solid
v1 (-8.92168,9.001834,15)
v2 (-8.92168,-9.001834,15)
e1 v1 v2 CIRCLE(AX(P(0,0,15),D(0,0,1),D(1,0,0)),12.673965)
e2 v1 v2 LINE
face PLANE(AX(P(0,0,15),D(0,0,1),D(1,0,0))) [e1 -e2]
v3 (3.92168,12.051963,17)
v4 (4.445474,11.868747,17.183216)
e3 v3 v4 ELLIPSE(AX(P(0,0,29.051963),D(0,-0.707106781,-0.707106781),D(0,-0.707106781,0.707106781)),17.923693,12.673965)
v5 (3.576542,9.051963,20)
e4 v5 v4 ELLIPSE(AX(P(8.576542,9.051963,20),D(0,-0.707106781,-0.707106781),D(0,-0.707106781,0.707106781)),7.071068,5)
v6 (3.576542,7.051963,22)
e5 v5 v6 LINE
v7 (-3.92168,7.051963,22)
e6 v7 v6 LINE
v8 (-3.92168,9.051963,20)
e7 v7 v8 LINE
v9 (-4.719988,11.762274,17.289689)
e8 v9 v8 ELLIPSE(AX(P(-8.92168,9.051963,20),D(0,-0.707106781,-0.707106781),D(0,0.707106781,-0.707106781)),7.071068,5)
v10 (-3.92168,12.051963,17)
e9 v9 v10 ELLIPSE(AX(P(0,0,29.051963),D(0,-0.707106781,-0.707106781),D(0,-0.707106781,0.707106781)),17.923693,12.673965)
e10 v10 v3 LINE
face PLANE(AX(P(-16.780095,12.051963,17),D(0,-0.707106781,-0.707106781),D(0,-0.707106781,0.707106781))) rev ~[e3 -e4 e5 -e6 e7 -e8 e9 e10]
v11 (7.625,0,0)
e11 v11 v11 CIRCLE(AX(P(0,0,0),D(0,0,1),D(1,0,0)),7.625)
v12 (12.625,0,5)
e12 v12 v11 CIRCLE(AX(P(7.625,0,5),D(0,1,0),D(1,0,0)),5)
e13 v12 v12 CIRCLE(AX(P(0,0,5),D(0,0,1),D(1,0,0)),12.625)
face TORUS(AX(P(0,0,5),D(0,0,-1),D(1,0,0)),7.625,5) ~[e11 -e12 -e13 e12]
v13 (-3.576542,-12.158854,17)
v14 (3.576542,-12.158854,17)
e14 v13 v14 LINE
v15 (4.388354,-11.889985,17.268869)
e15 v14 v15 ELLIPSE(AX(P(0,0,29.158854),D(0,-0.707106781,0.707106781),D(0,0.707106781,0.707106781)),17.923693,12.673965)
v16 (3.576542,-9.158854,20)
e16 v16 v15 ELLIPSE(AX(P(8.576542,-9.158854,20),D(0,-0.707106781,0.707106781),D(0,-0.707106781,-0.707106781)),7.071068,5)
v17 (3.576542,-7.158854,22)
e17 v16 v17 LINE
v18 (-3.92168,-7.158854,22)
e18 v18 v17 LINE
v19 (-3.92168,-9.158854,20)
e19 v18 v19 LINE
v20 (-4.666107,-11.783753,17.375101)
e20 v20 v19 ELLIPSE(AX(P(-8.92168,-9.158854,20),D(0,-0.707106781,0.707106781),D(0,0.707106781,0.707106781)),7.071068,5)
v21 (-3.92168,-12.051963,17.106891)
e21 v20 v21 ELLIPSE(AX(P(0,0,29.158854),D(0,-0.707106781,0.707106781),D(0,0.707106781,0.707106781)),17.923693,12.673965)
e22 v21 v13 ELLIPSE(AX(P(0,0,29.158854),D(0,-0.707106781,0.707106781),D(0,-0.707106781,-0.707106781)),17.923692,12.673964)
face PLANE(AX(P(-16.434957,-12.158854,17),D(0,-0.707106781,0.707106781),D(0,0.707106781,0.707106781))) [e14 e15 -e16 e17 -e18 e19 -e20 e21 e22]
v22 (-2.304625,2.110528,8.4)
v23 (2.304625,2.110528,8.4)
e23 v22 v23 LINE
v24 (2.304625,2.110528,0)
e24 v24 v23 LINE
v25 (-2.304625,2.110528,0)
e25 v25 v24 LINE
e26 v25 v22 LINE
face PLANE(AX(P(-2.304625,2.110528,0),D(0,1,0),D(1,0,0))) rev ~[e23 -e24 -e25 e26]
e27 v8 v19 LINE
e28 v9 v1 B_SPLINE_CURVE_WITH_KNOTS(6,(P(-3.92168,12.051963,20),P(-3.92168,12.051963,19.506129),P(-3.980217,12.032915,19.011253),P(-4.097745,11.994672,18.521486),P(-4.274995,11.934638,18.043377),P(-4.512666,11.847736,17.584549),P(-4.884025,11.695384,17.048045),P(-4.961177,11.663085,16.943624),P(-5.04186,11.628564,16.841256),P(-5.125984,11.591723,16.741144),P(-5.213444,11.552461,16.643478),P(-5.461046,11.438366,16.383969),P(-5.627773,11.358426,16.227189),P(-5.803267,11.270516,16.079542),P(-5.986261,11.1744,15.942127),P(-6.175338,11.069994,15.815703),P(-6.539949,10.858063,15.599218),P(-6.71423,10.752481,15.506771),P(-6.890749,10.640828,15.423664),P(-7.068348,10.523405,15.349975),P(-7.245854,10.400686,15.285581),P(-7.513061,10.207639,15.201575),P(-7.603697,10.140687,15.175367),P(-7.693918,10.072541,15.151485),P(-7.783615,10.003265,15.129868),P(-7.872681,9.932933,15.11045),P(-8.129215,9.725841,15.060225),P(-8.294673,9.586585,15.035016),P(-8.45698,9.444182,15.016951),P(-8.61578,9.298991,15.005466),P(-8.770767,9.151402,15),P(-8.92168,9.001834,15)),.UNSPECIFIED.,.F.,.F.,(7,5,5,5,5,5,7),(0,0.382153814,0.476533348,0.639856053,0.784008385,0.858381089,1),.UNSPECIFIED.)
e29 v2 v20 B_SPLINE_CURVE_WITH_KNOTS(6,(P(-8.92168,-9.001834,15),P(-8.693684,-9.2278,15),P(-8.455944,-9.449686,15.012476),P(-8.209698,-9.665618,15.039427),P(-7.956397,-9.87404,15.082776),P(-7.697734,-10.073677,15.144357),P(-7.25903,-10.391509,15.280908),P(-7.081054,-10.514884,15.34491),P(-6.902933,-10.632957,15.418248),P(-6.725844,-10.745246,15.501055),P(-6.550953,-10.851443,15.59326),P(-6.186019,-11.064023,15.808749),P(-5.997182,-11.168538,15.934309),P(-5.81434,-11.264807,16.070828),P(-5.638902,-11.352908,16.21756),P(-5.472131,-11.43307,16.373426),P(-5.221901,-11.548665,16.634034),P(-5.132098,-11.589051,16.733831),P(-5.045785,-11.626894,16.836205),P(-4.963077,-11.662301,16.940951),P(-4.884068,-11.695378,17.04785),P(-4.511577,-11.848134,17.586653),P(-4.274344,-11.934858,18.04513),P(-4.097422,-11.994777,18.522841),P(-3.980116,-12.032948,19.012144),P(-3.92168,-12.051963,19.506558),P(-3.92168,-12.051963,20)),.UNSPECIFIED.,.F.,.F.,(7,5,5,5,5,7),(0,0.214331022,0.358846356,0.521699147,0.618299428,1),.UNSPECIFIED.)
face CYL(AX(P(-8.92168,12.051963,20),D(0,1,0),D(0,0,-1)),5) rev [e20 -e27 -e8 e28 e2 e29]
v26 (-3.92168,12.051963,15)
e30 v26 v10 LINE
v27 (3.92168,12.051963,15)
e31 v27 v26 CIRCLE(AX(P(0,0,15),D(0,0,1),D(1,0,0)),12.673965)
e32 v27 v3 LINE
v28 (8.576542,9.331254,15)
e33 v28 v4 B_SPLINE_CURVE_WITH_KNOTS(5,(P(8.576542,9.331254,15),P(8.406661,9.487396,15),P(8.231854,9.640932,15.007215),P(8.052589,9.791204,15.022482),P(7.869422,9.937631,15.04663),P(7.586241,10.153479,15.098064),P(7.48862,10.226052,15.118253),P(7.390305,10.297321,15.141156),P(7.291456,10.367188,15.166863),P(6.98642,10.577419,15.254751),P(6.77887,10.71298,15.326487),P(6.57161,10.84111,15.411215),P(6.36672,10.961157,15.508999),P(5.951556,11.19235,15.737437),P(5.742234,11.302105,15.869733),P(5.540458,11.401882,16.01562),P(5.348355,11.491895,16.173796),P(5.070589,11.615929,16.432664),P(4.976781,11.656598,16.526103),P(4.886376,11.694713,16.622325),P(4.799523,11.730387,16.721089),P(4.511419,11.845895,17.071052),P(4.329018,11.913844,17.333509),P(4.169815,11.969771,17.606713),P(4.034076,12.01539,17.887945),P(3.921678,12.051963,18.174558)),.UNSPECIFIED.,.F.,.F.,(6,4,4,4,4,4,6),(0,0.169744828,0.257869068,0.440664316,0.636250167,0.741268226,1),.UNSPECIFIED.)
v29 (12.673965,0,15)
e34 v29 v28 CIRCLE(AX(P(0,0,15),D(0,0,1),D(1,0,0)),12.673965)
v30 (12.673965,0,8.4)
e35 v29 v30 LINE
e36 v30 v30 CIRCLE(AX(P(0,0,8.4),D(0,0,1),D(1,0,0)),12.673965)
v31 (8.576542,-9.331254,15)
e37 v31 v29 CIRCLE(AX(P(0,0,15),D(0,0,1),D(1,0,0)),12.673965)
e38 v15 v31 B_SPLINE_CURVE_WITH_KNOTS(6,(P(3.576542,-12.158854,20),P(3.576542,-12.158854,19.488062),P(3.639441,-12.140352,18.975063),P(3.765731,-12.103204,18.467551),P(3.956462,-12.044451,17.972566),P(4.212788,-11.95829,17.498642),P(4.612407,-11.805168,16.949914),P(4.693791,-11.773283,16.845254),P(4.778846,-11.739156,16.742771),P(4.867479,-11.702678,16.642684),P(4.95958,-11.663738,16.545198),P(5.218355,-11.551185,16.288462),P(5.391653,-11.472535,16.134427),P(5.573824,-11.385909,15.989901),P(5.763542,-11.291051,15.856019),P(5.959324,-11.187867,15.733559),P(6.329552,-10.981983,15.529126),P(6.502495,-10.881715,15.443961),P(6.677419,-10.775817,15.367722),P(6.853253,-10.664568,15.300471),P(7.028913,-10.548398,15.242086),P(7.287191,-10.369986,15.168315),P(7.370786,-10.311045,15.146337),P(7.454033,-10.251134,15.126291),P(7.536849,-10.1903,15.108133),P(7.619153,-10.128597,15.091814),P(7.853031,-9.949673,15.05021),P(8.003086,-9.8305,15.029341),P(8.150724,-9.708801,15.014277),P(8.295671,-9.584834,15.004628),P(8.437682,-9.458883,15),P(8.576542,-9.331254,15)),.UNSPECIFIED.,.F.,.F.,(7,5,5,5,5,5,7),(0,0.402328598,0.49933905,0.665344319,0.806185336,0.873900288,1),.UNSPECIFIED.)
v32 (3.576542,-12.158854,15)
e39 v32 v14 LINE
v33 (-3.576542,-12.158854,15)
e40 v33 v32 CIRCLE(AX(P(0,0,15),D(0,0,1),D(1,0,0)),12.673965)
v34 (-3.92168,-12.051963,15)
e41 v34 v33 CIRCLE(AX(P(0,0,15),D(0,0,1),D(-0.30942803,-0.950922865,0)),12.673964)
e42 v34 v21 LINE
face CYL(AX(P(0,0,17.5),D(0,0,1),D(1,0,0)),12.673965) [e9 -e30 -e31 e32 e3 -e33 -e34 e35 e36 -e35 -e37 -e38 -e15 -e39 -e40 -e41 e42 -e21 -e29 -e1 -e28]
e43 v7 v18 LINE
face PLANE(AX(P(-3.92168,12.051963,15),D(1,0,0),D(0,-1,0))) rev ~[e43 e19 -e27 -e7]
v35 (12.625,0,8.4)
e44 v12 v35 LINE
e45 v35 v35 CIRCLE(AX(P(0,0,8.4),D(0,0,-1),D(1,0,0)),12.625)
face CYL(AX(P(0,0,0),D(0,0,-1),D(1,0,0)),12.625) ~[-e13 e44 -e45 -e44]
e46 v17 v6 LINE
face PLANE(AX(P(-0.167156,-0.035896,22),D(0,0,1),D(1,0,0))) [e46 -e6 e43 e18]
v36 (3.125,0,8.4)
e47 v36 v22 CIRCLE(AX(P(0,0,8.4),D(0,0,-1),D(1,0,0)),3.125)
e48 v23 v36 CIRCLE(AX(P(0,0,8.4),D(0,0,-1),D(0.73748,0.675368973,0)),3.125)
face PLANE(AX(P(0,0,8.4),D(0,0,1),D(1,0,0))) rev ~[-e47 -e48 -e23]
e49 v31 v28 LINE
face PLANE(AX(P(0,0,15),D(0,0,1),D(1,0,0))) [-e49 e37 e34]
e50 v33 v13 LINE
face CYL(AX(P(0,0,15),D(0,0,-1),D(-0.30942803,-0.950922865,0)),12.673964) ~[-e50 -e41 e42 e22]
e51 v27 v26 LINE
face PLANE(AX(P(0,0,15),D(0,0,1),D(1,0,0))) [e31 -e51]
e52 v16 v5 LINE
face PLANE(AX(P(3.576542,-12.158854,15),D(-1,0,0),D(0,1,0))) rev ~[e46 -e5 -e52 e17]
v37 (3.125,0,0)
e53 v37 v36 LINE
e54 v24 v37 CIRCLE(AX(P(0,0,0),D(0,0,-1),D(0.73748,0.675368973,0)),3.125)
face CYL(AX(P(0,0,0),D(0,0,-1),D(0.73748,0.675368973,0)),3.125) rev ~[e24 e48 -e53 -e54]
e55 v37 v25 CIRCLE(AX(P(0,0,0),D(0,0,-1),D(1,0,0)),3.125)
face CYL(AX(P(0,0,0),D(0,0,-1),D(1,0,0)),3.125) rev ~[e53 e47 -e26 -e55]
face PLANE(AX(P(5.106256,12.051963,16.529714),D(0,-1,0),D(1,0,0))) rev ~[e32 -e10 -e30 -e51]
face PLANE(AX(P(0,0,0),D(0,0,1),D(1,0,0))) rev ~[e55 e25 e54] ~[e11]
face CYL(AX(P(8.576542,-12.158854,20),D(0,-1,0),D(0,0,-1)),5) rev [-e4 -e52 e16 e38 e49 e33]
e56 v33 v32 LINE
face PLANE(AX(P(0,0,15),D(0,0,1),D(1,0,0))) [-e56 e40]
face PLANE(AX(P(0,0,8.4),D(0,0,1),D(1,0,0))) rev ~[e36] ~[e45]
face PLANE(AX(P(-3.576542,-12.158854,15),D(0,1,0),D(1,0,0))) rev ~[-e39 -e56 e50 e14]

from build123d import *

# Parameters (mm, degrees)
F0_R         = 12.625
F0_R_2       = 10.375
F0_R_3       = 5
F1_DEPTH     = 15
F2_DEPTH     = 15
F3_R         = 12.6739646699
F4_DEPTH     = 6.6
F6_DEPTH     = 7
F7_T4_DEPTH  = 36.6039255786
F7_S5_R      = 12.6739646699
F7_T6_DEPTH  = 20
F7_T10_DEPTH = 24.210816556
F7_S11_R     = 12.6739646699
F7_T12_DEPTH = 14
F8_T1_DEPTH  = 32.8699146781
F9_T1_DEPTH  = 33.2150521969
F10_R        = 5


# Not quite as in the source:
# - a fillet or chamfer that OpenCascade refuses, or shapes differently, is made with other operations: its cross-section is extruded or revolved along the edge and cut away or added
# - a feature names something its author has since deleted; it is built from what else it names


with BuildPart() as f1:
    # F0 (on Top) → F1 (new body)
    with BuildSketch(Plane.XY):
        Circle(F0_R)
        Circle(F0_R_2, mode=Mode.SUBTRACT)
        Circle(F0_R_2)
        Circle(F0_R_3, mode=Mode.SUBTRACT)
    extrude(amount=F1_DEPTH)

    # F0 (on Top) → F2 (join)
    with BuildSketch(Plane.XY):
        Circle(F0_R_3)
        with BuildLine():
            ThreePointArc((2.304625, 2.1105280404), (2.9126944678, 1.1321819366), (3.125, 0))
            ThreePointArc((3.125, 0), (-1.1321819366, -2.9126944678), (-2.304625, 2.1105280404))
            ThreePointArc((-2.304625, 2.1105280404), (0, 3.125), (2.304625, 2.1105280404))
        make_face(mode=Mode.SUBTRACT)
        with BuildLine():
            Line((-2.304625, 2.1105280404), (2.304625, 2.1105280404))
            ThreePointArc((2.304625, 2.1105280404), (0, 3.125), (-2.304625, 2.1105280404))
        make_face()
    extrude(amount=F2_DEPTH)

    # F3 (on face) → F4 (join)
    with BuildSketch(Plane.XY.offset(15)):
        Circle(F3_R)
    extrude(amount=-F4_DEPTH)

    # F5 (on face) → F6 (join)
    with BuildSketch(Plane.XY.offset(15)):
        with BuildLine():
            Line((3.5765423992, 12.0519627893), (-3.921679918, 12.0519627893))
            Line((-3.921679918, 12.0519627893), (-3.921679918, -12.0519627893))
            ThreePointArc((-3.921679918, -12.0519627893), (-3.7494920856, -12.1066382433), (-3.5765423992, -12.1588537667))
            Line((-3.5765423992, -12.1588537667), (3.5765423992, -12.1588537667))
            Line((3.5765423992, -12.1588537667), (3.5765423992, 12.0519627893))
        make_face()
    extrude(amount=F6_DEPTH)

    # F7: fillet of radius 5 on 2 edges, made by hand


with BuildPart() as f7_tool2:
    # F7_s3 → F7_t4 (new body)
    with BuildSketch(Plane.XZ.offset(-12.0519627893)):
        with BuildLine():
            ThreePointArc((-8.921679918, 15), (-5.3861460121, 16.4644660941), (-3.921679918, 20))
            Line((-3.921679918, 20), (-3.921679918, 15))
            Line((-3.921679918, 15), (-8.921679918, 15))
        make_face()
    extrude(amount=F7_T4_DEPTH)

    # F7_s5 → F7_t6 (intersect, symmetric)
    with BuildSketch(Plane.XY.offset(17.5)):
        Circle(F7_S5_R)
    extrude(amount=F7_T6_DEPTH, both=True, mode=Mode.INTERSECT)


with BuildPart() as f1_1:
    add(f1.part)

    # F7_t1: union F7_tool2
    add(f7_tool2.part)


with BuildPart() as f7_tool8:
    # F7_s9 → F7_t10 (new body)
    with BuildSketch(Plane.XZ.offset(12.1588537667)):
        with BuildLine():
            ThreePointArc((8.5765423992, 15), (5.0410084933, 16.4644660941), (3.5765423992, 20))
            Line((3.5765423992, 20), (3.5765423992, 15))
            Line((3.5765423992, 15), (8.5765423992, 15))
        make_face()
    extrude(amount=-F7_T10_DEPTH)

    # F7_s11 → F7_t12 (intersect, symmetric)
    with BuildSketch(Plane.XY.offset(17.5)):
        Circle(F7_S11_R)
    extrude(amount=F7_T12_DEPTH, both=True, mode=Mode.INTERSECT)


with BuildPart() as f1_2:
    add(f1_1.part)

    # F7_t7: union F7_tool8
    add(f7_tool8.part)

    # F8: chamfer of 5 on 1 edges, made by hand

    # F8_s2 → F8_t1 (cut)
    with BuildSketch(Plane.YZ.offset(-16.434957339)):
        Polygon((-12.1588537667, 17), (-7.1588537667, 22), (-12.1588537667, 22), align=None)
    extrude(amount=F8_T1_DEPTH, mode=Mode.SUBTRACT)

    # F9: chamfer of 5 on 1 edges, made by hand

    # F9_s2 → F9_t1 (cut)
    with BuildSketch(Plane.YZ.offset(-16.7800948578)):
        Polygon((12.0519627893, 17), (7.0519627893, 22), (12.0519627893, 22), align=None)
    extrude(amount=F9_T1_DEPTH, mode=Mode.SUBTRACT)

    # F10
    f10_edges = [f1_2.edges().sort_by_distance(p)[0] for p in [
        (-12.625, 0, 0),
    ]]
    fillet(f10_edges, radius=F10_R)


solid = f1_2.part
